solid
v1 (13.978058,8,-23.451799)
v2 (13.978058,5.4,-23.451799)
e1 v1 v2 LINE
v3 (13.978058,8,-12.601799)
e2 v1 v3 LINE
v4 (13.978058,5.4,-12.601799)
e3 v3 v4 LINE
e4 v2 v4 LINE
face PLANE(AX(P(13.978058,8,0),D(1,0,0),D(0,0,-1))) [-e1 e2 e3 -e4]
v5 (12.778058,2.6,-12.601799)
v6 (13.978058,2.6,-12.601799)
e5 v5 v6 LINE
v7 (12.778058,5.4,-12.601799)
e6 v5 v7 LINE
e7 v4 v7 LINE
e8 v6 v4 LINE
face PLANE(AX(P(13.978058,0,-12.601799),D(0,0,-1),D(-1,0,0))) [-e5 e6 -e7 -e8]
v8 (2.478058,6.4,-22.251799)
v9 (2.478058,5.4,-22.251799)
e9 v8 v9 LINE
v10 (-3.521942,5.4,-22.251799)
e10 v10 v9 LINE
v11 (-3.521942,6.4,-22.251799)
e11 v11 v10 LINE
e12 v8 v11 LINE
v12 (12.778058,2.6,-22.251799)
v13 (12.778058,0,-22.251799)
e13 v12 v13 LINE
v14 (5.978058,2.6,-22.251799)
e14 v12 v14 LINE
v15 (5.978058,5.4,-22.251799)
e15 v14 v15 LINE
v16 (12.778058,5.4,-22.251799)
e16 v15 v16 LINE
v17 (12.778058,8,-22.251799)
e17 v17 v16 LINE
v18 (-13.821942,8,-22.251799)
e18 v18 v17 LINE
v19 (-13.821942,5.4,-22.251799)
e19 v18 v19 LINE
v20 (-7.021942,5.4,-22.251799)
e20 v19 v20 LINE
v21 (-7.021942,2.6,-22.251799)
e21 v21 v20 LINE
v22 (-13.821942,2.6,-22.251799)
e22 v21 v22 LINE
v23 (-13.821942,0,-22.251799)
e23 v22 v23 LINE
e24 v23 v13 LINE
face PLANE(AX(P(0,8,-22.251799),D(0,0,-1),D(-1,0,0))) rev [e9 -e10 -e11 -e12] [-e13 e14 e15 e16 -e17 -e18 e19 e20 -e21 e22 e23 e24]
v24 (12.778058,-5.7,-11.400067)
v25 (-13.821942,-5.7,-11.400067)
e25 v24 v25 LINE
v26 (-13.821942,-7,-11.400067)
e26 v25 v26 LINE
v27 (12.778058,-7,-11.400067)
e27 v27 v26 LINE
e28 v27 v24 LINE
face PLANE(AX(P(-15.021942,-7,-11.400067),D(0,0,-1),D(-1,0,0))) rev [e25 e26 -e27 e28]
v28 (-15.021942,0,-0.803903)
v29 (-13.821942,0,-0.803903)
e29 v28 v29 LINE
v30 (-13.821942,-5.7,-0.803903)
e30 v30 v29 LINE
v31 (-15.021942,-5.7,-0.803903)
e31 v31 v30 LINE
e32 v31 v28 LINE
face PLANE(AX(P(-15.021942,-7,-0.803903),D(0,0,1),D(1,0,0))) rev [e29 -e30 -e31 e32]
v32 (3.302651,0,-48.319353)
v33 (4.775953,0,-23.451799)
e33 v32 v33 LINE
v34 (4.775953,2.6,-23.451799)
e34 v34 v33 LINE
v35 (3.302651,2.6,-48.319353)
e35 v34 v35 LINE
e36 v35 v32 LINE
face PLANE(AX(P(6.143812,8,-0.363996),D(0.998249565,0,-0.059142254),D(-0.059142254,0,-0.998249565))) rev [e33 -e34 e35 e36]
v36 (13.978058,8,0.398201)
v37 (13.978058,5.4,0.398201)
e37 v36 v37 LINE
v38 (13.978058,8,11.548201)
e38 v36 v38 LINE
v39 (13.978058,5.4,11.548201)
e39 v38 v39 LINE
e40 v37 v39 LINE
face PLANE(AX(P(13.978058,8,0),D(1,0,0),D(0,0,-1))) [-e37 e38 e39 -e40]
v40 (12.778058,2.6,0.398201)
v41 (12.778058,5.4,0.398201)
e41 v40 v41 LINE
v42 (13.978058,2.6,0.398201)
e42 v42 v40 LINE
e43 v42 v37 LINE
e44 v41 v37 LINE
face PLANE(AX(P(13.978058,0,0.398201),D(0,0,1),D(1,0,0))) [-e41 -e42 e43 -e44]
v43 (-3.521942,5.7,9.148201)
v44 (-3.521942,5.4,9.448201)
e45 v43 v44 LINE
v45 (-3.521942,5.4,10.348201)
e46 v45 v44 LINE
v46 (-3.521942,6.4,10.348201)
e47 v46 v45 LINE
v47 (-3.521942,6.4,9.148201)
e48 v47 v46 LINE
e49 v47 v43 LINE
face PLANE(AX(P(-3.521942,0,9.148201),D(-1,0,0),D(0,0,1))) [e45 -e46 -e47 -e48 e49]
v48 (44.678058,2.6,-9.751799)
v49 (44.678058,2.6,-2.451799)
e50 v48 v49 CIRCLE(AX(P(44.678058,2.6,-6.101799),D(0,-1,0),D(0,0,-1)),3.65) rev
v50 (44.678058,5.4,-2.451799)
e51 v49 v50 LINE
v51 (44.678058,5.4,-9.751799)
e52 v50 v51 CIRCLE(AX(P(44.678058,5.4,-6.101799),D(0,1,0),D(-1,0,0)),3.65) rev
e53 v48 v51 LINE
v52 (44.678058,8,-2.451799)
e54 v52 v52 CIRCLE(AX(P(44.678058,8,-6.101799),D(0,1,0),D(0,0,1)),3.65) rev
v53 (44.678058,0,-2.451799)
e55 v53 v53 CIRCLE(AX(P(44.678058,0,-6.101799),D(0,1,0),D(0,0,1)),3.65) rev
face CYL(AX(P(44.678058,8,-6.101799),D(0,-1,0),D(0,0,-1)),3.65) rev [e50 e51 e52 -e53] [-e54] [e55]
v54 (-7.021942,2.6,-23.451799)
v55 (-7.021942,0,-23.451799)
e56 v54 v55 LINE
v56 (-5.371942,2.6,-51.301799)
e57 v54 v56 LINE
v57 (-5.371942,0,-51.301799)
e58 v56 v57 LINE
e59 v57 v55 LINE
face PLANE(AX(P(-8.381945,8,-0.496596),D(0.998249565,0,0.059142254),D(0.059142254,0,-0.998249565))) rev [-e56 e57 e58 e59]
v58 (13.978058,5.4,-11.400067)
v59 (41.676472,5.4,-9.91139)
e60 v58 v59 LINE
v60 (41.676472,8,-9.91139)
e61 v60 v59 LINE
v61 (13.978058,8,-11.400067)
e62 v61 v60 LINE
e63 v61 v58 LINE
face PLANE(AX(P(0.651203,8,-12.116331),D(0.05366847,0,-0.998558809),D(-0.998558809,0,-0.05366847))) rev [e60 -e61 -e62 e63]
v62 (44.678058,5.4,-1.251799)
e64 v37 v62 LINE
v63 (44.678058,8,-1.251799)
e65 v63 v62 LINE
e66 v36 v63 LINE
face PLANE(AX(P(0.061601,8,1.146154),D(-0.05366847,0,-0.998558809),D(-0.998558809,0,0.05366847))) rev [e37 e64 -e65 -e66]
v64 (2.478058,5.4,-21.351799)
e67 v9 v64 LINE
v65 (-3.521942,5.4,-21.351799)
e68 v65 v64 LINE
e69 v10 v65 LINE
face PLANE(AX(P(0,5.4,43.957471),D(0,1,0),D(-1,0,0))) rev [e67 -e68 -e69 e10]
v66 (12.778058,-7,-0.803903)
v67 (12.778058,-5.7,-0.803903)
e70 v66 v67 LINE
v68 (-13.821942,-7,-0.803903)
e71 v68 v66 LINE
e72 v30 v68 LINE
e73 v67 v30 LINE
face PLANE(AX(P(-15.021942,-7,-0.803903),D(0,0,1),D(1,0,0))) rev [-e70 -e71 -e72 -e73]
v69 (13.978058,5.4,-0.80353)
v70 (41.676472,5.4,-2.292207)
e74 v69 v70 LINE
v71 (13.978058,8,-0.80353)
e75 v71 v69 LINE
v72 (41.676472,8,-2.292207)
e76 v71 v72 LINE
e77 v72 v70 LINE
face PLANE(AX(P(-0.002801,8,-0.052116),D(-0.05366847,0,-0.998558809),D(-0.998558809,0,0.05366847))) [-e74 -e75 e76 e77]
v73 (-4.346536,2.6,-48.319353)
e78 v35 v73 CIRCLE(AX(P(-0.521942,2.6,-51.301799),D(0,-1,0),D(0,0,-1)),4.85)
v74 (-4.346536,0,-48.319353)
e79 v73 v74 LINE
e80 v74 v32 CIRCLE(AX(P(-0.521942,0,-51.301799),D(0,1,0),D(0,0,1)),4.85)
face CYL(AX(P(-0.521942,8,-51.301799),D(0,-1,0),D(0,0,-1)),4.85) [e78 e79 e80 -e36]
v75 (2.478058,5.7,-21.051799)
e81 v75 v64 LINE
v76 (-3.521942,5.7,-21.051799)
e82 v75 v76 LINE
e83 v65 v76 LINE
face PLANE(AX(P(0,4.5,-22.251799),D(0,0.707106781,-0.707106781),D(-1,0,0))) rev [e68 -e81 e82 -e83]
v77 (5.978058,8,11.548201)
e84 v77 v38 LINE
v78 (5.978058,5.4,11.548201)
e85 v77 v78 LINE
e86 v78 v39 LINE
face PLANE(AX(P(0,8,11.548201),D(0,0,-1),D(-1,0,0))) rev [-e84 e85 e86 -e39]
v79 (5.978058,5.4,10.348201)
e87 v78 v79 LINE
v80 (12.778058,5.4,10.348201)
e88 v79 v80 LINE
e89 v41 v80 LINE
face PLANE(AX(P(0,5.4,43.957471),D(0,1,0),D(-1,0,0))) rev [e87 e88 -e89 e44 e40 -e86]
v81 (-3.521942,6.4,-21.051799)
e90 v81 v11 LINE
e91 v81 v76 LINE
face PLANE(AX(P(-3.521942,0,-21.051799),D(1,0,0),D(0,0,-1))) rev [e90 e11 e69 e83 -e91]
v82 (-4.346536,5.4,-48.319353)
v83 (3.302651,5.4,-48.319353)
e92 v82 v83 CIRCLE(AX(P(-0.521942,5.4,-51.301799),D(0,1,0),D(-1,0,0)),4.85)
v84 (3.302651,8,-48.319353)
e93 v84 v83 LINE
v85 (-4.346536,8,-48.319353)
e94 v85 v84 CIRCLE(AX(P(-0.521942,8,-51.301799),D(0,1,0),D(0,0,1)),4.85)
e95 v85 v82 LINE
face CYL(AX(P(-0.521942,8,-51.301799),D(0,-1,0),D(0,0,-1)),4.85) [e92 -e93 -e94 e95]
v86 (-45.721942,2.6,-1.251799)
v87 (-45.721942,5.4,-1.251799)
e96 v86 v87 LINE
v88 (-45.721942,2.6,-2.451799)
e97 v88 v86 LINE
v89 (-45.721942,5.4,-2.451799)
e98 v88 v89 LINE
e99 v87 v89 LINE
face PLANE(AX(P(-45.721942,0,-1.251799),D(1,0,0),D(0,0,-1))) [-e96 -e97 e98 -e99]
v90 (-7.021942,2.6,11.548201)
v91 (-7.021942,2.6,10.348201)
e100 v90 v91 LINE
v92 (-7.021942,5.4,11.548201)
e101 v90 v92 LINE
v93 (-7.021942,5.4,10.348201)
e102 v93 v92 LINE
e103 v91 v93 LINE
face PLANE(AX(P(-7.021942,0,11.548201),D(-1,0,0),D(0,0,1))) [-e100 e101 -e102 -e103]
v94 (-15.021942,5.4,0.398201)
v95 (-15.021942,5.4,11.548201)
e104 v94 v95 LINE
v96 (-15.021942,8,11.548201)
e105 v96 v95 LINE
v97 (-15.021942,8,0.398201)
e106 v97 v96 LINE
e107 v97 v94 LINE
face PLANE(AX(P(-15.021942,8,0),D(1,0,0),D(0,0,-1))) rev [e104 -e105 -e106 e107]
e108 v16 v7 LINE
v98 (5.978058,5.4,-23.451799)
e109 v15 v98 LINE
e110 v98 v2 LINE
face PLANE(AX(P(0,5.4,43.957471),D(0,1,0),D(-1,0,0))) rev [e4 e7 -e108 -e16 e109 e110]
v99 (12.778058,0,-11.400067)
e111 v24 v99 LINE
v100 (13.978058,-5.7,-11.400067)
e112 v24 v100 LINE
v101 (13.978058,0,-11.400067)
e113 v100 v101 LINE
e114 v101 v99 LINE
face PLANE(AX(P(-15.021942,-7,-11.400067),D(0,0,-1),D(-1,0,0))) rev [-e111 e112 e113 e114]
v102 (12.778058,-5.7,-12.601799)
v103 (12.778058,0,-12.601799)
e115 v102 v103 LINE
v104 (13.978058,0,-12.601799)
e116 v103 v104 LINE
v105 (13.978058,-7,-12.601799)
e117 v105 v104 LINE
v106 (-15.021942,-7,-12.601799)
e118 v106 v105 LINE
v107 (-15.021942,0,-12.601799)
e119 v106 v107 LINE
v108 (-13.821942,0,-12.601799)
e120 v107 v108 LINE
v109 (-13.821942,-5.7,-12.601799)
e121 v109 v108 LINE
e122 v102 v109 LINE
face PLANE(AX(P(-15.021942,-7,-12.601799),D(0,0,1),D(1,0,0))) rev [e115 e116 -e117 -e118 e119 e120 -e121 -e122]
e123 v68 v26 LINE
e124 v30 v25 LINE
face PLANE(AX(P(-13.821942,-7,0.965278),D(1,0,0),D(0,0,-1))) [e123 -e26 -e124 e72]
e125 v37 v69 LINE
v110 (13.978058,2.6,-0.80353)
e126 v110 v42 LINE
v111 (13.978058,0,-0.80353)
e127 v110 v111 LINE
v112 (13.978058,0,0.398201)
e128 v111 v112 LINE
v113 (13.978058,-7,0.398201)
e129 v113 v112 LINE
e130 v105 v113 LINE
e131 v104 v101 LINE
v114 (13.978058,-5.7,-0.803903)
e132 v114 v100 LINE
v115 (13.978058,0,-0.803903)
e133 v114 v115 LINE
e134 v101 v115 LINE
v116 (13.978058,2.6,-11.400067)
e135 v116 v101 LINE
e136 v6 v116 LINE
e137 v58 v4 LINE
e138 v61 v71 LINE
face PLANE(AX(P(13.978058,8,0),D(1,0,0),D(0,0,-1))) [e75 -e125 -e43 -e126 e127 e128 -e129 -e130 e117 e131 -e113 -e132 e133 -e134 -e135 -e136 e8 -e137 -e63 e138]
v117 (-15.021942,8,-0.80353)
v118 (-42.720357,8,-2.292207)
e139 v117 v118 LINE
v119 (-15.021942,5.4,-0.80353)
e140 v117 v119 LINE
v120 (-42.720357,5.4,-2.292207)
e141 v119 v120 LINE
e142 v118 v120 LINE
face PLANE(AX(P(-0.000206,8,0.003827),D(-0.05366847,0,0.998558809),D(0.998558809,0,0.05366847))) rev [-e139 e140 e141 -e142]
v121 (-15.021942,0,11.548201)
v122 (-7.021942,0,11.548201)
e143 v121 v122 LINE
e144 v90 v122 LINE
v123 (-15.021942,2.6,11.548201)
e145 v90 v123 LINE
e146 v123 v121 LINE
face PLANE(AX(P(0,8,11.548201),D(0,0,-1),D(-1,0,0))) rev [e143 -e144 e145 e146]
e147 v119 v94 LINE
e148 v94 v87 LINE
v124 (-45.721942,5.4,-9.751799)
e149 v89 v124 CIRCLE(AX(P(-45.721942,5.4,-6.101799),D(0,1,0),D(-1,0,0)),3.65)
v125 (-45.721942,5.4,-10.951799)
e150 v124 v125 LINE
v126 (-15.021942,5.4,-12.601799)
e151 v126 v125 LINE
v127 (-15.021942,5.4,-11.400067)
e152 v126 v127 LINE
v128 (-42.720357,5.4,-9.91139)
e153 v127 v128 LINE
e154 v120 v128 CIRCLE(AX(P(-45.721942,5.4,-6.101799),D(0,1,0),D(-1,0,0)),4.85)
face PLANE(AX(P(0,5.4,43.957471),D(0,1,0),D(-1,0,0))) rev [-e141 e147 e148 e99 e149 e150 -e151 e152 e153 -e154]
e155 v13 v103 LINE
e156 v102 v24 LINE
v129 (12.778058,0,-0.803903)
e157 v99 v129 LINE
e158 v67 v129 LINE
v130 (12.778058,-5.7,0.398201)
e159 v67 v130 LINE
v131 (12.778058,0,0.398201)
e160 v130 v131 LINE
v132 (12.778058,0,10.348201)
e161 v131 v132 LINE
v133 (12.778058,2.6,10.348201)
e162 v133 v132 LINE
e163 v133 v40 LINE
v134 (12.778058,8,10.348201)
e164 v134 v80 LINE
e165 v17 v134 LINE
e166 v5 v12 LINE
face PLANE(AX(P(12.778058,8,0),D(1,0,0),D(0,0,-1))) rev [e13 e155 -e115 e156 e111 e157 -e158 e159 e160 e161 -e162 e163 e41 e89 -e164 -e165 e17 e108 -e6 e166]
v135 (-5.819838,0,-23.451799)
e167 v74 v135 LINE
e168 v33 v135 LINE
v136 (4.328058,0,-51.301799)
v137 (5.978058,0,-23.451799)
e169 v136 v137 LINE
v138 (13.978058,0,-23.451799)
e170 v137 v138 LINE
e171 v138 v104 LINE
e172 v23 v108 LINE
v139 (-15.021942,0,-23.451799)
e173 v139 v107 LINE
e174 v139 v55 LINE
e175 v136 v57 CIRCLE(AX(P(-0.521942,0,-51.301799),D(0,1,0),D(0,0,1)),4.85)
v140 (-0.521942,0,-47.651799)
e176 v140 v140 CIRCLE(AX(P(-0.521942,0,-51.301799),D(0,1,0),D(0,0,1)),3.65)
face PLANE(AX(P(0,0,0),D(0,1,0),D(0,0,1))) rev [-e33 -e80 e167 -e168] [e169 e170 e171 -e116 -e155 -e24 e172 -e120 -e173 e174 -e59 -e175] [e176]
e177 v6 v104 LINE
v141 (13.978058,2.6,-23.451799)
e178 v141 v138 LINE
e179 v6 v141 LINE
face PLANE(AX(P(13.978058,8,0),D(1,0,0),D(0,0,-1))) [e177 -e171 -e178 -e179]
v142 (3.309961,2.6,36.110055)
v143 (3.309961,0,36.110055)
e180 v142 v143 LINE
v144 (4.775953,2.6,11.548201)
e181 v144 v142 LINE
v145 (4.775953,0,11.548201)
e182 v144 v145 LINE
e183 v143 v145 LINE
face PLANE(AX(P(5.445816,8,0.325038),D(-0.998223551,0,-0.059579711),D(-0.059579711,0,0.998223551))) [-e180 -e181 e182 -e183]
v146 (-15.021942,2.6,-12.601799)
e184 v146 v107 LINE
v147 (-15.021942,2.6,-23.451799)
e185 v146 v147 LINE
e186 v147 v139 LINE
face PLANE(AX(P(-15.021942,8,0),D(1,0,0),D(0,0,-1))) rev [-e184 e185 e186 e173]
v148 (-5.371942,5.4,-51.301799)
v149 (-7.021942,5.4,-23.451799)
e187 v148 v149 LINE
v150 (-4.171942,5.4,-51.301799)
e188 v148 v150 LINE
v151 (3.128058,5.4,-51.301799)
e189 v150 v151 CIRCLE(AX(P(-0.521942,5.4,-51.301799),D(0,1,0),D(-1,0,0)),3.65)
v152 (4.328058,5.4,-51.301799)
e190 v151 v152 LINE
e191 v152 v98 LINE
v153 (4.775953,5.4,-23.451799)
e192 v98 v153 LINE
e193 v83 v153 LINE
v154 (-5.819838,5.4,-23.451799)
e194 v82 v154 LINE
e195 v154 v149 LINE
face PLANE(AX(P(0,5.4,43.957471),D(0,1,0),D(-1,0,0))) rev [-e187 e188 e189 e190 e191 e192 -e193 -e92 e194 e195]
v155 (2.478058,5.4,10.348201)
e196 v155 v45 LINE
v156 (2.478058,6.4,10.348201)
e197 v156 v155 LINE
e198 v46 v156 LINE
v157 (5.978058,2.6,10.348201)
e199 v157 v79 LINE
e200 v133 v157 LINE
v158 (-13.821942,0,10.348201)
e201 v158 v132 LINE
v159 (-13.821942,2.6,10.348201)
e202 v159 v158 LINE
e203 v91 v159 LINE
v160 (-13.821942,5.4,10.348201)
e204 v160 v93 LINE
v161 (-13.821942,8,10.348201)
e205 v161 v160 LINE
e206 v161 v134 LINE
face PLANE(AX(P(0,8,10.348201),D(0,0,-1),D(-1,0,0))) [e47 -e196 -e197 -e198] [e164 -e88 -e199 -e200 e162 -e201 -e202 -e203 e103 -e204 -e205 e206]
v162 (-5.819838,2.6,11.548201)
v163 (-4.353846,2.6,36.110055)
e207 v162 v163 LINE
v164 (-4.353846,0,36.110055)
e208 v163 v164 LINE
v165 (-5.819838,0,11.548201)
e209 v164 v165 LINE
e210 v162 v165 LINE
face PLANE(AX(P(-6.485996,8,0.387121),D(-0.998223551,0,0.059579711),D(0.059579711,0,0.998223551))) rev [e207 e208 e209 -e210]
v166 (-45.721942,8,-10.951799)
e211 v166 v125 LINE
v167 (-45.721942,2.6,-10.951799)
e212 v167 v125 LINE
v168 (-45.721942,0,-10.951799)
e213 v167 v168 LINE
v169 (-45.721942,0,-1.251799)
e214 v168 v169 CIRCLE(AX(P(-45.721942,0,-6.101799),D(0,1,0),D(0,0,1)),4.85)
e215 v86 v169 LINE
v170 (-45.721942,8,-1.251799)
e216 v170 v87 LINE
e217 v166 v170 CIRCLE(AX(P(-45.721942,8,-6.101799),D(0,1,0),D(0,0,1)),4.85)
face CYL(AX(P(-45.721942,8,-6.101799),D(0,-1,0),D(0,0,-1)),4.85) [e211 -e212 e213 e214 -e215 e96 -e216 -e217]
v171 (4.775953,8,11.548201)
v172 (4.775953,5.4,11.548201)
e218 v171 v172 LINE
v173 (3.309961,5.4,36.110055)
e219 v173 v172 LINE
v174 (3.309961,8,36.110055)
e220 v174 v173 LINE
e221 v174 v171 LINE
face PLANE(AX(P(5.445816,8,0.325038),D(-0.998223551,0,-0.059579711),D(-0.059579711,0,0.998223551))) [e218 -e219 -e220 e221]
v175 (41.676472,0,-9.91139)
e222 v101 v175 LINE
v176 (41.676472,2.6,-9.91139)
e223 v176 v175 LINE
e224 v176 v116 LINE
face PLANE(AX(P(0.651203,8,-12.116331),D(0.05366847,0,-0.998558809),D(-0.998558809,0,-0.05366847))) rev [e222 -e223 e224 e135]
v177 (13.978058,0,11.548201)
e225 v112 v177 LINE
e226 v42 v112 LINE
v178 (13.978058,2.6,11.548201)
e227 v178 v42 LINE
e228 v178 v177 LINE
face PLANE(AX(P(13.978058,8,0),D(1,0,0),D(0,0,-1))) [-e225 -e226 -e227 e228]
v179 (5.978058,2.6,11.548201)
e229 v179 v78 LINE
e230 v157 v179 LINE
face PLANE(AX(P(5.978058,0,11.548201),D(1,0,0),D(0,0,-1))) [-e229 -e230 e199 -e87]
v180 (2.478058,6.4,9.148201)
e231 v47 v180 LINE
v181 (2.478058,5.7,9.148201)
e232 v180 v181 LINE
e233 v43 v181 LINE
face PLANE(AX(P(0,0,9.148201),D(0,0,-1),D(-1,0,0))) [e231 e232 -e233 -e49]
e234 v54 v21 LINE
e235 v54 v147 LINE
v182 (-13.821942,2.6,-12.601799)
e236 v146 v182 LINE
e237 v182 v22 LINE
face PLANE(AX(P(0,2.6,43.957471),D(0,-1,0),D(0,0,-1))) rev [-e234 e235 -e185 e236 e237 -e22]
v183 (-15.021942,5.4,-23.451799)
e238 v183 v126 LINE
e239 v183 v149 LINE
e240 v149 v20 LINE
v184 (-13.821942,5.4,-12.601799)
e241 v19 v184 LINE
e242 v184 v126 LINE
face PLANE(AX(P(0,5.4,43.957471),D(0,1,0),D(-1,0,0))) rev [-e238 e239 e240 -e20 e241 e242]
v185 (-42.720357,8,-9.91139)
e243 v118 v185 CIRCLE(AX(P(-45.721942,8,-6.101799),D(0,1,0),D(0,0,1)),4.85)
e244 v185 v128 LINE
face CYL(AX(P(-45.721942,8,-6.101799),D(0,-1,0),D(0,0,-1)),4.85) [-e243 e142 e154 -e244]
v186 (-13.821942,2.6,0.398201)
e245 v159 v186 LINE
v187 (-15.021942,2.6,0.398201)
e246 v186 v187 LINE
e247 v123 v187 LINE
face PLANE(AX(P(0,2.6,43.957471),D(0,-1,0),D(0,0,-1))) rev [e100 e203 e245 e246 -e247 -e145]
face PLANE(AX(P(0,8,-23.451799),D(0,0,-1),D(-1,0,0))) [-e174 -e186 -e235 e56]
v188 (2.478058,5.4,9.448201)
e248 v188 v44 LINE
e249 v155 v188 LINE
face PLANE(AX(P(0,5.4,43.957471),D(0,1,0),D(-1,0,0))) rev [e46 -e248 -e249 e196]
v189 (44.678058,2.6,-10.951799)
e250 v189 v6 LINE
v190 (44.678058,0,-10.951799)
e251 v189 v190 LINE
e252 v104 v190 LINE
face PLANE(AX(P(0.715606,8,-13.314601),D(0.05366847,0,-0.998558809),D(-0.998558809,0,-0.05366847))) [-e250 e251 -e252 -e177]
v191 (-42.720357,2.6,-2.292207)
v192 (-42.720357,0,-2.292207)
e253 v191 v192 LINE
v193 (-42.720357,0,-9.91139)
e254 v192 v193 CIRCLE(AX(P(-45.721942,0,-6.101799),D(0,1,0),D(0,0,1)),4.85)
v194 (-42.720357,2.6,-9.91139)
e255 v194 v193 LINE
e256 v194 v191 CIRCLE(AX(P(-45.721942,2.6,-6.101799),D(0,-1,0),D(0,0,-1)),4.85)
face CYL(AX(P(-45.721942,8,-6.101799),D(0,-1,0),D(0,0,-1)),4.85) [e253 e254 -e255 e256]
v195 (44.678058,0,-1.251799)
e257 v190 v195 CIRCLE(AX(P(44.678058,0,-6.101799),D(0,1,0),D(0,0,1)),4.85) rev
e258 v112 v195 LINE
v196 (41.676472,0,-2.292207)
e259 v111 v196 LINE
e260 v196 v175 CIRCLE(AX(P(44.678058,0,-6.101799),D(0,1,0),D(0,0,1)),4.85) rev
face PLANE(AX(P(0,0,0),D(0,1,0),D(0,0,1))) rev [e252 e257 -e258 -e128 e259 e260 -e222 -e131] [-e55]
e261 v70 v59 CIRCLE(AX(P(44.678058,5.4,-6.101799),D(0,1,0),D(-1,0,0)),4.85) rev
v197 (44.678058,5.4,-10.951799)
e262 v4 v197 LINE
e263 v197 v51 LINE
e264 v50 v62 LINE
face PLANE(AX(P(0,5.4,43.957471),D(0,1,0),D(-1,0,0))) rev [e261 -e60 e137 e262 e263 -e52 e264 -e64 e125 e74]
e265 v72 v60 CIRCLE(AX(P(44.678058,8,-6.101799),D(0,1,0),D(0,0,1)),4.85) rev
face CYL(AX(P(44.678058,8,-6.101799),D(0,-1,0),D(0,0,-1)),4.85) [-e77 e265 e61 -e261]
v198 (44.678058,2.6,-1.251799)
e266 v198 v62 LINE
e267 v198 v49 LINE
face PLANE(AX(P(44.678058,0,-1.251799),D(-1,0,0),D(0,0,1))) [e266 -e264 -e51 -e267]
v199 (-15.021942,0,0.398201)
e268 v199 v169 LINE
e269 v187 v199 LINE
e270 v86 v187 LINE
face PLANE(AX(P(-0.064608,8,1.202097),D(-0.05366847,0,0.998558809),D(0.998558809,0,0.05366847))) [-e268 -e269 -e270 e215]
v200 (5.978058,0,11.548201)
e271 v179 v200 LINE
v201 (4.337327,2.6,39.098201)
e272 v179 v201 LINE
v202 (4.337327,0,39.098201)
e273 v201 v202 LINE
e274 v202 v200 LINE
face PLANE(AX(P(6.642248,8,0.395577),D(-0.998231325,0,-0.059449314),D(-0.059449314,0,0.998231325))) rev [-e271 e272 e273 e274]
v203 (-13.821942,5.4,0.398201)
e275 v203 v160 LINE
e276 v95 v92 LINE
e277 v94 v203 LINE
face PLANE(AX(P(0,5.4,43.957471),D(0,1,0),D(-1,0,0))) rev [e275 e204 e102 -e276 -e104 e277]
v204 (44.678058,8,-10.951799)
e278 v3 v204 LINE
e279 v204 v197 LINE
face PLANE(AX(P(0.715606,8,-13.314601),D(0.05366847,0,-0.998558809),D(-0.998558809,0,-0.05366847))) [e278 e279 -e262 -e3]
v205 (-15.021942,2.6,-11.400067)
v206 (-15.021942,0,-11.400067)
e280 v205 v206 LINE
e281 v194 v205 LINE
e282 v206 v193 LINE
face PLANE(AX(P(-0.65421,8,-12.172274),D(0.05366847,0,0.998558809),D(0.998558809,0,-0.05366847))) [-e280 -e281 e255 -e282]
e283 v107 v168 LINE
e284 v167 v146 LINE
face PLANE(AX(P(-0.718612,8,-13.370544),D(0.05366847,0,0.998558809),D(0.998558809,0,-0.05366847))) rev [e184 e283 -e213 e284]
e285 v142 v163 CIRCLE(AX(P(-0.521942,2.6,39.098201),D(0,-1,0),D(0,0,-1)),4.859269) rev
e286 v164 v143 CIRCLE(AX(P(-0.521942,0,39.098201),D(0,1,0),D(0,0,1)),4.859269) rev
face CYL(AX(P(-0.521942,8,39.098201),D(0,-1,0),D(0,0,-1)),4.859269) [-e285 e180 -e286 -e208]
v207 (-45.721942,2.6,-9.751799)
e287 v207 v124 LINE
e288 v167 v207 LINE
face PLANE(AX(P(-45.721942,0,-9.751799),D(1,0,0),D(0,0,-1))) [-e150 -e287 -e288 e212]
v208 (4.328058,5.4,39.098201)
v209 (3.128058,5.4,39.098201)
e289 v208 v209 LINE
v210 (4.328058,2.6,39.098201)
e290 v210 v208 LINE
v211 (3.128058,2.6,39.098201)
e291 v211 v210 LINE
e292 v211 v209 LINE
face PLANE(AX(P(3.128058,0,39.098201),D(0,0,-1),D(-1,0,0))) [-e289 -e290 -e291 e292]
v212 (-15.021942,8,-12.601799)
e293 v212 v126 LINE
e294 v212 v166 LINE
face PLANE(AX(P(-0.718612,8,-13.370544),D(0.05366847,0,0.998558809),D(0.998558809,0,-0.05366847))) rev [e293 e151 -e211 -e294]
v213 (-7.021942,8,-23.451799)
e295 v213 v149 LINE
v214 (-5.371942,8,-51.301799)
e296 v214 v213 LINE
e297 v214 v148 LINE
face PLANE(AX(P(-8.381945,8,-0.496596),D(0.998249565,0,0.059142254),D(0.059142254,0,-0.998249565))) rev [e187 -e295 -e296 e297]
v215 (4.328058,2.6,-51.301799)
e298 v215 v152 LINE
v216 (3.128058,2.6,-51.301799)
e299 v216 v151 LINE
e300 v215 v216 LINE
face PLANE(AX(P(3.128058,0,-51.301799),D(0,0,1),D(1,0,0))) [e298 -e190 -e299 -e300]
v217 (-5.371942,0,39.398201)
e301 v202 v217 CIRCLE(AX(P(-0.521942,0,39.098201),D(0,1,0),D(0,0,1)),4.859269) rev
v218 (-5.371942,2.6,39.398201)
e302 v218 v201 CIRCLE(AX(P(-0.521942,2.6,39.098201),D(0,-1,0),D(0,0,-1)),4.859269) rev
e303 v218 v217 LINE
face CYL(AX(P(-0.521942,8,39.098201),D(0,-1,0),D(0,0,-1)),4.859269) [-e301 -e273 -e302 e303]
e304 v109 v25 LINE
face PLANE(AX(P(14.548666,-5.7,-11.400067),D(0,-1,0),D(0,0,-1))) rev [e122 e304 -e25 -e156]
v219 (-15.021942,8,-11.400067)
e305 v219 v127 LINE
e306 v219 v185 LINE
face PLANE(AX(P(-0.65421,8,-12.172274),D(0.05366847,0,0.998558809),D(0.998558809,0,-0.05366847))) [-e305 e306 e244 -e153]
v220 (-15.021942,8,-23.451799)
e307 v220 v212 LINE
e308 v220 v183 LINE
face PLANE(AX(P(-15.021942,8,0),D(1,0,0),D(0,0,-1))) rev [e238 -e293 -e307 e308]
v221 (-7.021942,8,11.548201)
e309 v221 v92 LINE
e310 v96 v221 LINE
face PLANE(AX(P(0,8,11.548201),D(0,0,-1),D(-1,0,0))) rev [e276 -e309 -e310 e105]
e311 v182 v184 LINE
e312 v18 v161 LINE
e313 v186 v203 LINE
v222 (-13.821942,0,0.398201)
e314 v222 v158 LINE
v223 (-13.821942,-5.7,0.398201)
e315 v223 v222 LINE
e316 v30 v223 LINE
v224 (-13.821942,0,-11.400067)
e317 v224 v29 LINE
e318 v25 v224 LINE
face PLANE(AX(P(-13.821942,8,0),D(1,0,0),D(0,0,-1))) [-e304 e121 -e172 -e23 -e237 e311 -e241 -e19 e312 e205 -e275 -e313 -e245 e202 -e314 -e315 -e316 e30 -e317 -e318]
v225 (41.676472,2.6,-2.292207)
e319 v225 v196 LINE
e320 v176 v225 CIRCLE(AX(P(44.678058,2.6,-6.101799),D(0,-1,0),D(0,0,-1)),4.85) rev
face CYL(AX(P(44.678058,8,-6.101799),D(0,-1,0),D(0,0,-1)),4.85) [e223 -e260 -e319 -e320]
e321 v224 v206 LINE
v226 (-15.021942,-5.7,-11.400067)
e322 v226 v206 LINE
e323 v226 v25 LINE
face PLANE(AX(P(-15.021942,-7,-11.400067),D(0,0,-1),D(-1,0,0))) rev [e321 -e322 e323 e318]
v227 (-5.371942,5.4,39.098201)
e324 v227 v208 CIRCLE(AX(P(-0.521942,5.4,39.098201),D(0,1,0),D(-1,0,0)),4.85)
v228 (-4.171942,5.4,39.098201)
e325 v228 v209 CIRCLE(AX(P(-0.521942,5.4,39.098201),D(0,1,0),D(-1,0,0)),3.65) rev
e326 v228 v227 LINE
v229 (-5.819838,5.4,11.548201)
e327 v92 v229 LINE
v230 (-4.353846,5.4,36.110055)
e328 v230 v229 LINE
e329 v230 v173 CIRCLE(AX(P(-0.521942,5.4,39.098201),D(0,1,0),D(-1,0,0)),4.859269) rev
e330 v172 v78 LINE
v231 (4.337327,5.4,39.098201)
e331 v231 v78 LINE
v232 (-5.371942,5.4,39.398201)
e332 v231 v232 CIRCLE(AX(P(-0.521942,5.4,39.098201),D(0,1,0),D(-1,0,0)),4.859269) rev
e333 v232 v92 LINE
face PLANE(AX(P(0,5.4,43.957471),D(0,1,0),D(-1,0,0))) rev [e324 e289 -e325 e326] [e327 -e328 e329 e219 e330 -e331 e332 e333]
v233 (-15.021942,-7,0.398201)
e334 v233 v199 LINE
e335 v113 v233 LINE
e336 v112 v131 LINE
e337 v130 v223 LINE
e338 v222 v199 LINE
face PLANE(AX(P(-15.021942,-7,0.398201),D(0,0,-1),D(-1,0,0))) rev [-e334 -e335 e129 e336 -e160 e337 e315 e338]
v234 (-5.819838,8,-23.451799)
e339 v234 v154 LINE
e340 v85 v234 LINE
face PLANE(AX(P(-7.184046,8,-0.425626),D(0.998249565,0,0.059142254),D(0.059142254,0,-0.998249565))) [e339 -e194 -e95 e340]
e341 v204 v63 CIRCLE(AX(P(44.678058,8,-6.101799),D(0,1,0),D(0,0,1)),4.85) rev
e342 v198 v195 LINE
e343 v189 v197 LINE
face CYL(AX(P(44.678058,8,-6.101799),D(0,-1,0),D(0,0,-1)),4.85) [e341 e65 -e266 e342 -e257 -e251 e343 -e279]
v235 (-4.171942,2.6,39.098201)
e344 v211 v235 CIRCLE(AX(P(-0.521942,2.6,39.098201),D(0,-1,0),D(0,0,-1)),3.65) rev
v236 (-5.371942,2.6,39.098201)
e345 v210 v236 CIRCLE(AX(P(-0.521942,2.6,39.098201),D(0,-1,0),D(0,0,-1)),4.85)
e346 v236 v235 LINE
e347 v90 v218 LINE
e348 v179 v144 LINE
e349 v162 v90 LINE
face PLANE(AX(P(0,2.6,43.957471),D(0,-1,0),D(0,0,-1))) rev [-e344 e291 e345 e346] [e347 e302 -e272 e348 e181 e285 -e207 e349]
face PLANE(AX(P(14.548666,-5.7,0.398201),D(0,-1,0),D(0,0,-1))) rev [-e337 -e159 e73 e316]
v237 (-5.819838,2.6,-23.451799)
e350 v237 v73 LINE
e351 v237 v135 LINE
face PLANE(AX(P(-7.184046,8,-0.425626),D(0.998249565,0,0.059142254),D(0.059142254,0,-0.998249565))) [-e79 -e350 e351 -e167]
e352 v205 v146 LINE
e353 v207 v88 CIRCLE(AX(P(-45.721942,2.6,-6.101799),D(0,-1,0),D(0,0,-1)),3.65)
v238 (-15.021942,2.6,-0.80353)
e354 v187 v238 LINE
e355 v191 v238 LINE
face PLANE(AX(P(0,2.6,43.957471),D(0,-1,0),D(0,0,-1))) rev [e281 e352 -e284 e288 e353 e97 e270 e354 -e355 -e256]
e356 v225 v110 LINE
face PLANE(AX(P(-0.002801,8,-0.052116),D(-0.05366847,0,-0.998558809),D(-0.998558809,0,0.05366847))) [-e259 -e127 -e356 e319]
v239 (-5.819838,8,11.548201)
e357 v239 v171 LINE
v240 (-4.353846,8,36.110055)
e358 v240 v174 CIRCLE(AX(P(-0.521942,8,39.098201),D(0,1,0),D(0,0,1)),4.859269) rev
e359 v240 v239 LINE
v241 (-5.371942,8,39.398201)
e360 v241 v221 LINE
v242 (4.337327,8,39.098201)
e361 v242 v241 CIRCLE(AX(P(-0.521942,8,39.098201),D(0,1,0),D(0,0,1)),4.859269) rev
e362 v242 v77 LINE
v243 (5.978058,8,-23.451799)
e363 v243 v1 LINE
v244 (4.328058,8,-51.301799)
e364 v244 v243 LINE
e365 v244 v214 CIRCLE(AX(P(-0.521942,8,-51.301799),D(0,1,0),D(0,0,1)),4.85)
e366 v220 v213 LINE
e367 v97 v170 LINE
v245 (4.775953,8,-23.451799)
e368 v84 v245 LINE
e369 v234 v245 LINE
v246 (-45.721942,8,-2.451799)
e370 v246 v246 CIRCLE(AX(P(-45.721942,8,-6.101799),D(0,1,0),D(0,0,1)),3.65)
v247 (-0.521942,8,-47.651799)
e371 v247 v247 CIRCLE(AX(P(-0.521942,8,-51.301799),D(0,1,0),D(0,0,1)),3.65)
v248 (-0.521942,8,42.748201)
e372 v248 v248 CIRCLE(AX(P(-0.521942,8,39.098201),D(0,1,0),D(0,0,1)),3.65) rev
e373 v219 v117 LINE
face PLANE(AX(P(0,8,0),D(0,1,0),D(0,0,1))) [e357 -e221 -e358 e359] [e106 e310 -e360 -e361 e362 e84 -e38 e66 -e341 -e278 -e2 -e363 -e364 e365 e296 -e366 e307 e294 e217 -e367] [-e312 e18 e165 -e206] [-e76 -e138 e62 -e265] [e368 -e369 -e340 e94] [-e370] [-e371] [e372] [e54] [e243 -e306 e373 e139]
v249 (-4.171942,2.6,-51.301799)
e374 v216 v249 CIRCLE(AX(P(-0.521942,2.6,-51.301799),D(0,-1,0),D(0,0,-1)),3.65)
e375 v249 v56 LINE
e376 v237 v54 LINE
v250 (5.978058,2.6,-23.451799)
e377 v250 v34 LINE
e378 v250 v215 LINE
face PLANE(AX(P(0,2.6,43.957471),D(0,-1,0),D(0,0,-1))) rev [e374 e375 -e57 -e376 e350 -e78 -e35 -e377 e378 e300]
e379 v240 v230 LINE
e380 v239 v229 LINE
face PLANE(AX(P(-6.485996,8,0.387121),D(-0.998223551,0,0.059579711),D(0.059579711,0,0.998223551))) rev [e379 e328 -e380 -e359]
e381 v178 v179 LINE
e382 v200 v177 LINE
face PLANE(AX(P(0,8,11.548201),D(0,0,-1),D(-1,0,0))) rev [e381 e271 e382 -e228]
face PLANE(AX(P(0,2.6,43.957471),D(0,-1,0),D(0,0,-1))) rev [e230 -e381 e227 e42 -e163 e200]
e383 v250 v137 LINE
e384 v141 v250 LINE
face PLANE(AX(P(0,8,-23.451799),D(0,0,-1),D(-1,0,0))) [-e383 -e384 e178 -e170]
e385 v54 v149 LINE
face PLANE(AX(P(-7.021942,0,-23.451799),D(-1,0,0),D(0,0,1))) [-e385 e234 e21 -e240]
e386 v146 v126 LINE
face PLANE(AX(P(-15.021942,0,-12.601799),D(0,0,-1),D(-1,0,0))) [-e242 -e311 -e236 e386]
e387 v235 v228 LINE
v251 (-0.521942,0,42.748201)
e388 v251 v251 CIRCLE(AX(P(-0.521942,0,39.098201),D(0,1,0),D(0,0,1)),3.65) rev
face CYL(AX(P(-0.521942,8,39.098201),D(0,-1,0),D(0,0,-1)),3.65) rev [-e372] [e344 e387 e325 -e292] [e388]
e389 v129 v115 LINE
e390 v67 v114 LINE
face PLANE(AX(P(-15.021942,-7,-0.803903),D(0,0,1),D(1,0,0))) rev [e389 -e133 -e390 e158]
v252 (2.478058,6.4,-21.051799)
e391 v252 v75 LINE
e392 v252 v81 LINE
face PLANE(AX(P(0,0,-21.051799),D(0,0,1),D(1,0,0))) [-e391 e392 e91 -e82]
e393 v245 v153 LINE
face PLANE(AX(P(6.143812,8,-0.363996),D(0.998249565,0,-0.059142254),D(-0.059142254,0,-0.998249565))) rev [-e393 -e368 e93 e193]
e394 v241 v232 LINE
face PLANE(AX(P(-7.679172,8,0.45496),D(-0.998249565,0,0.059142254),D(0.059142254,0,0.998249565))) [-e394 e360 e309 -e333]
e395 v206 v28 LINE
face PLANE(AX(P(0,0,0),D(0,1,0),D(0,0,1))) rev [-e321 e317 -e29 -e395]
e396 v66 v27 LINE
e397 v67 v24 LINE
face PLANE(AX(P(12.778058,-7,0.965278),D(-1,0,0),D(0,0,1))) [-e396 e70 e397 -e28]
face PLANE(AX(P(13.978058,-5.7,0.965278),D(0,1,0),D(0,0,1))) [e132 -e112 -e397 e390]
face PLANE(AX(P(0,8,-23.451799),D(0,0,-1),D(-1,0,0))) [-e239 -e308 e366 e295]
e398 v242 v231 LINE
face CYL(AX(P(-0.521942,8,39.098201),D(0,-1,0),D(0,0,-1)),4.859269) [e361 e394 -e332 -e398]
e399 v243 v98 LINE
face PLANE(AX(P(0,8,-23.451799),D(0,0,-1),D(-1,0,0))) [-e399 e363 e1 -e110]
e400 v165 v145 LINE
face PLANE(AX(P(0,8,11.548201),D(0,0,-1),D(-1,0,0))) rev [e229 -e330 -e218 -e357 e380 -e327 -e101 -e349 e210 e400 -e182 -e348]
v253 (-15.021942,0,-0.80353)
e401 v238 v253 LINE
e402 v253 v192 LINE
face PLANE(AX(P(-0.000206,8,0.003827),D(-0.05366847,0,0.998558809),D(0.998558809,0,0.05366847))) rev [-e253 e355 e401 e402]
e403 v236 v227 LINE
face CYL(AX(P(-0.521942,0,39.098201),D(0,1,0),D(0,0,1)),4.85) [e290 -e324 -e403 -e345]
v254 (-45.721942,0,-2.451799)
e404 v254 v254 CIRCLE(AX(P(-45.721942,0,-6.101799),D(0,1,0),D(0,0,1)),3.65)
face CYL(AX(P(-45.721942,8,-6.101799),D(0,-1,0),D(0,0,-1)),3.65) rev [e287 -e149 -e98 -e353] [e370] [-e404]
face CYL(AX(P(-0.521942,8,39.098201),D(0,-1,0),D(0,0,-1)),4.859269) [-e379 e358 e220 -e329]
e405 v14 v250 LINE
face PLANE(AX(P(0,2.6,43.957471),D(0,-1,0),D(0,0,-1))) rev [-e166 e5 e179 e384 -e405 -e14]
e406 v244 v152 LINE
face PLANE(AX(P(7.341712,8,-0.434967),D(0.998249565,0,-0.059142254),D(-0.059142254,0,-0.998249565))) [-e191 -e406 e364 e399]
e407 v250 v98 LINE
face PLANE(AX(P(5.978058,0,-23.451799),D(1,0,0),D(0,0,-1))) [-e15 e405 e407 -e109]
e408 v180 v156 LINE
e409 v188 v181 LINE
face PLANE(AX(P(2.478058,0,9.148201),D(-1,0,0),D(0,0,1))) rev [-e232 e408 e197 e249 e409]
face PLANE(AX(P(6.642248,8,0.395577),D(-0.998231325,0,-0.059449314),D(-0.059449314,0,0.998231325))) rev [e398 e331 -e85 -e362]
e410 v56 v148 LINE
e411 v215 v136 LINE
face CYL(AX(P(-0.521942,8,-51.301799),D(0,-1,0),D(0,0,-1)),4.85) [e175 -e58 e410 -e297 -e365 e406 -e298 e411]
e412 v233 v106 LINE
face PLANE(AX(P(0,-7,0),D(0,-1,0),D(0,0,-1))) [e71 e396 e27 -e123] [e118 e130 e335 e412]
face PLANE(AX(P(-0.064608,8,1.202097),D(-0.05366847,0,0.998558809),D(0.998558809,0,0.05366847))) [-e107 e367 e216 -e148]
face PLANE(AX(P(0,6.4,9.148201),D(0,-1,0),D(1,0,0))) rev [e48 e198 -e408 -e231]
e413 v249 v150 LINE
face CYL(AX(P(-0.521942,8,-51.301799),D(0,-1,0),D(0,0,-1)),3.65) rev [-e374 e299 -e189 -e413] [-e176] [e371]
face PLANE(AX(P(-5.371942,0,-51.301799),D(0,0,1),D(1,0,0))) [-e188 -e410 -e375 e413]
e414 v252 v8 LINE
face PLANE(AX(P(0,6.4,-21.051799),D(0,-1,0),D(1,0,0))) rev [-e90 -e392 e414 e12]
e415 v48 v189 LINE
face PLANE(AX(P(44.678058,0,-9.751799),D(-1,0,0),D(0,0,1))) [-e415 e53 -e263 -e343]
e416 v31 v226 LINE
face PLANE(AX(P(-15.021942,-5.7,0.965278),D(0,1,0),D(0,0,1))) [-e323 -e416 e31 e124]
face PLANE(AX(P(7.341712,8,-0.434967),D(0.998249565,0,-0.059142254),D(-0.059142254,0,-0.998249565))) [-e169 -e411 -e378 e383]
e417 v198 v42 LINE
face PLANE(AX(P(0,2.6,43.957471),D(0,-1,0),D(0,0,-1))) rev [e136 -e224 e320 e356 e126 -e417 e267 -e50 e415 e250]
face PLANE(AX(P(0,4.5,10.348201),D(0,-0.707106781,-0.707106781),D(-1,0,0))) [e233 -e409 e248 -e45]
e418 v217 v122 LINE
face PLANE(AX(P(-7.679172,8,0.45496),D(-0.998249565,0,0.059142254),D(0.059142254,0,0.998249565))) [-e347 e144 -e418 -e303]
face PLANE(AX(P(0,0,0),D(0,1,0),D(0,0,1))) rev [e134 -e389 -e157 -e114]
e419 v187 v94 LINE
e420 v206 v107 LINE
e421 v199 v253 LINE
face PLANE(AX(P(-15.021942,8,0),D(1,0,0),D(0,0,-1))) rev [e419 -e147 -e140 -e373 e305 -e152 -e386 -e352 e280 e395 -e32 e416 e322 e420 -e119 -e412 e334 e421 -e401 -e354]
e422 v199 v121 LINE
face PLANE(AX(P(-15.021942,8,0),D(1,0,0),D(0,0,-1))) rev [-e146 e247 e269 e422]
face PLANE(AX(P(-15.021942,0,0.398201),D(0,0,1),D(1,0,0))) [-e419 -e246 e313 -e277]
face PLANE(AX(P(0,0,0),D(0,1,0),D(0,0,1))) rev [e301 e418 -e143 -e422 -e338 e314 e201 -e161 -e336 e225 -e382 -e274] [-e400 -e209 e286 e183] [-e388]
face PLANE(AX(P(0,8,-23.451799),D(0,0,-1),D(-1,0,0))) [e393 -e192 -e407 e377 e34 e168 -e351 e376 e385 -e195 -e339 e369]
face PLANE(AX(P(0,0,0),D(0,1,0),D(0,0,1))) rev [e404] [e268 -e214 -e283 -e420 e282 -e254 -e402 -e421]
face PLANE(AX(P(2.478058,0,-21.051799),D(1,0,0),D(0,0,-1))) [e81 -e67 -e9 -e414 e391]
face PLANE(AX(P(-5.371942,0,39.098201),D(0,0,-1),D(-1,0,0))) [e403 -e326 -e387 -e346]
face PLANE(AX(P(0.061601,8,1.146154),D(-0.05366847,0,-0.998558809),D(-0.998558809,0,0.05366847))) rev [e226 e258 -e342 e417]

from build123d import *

# Parameters (mm, degrees)
SKETCH1_R               = 3.65
SKETCH1_W               = 26.6
SKETCH1_H               = 32.6
BOSS_EXTRUDE1_DEPTH     = 8
SKETCH2_W               = 3
SKETCH2_H               = 0.7
BOSS_EXTRUDE2_DEPTH     = 1.2
SKETCH3_W               = 3
SKETCH3_H               = 0.7
BOSS_EXTRUDE3_DEPTH     = 1.2
CHAMFER1_SIZE           = 1.2
CUT_EXTRUDE1_DEPTH      = 85.649459397
CUT_EXTRUDE1_DEPTH_BACK = 85.649459397
SKETCH4_W               = 48.801078557
SKETCH4_H               = 1.4
SKETCH4_W_2             = 10.59579159
SKETCH4_W_3             = 46.838011079
BOSS_EXTRUDE4_START     = -5.4
SKETCH5_W               = 13
SKETCH5_H               = 1.2
SKETCH5_W_2             = 1.2
SKETCH5_H_2             = 13
BOSS_EXTRUDE4_DEPTH     = 2.8
BOSS_EXTRUDE5_REACH     = 77.99
SKETCH7_W               = 1.2
SKETCH7_H               = 1.202104206
SKETCH7_H_2             = 1.201731925
BOSS_EXTRUDE6_DEPTH     = 7
SKETCH8_W               = 1.202104206
SKETCH8_H               = 1.3
SKETCH8_W_2             = 1.201731925
BOSS_EXTRUDE7_DEPTH     = 26.6
SKETCH9_W               = 1.2
SKETCH9_H               = 1.3
BOSS_EXTRUDE8_DEPTH     = 11.797895795


with BuildPart() as part:
    # Sketch1 → Boss-Extrude1 (new body)
    with BuildSketch(Plane(origin=(0, 0, 0), x_dir=(1, 0, 0), z_dir=(0, 1, 0))):
        with BuildLine():
            Line((-7.021942446, 23.451798561), (-15.021942446, 23.451798561))
            Line((-15.021942446, 23.451798561), (-15.021942446, 12.601798561))
            Line((-15.021942446, 12.601798561), (-45.721942446, 10.951798561))
            ThreePointArc((-45.721942446, 10.951798561), (-50.571942446, 6.101798561), (-45.721942446, 1.251798561))
            Line((-45.721942446, 1.251798561), (-15.021942446, -0.398201439))
            Line((-15.021942446, -0.398201439), (-15.021942446, -11.548201439))
            Line((-15.021942446, -11.548201439), (-7.021942446, -11.548201439))
            Line((-7.021942446, -11.548201439), (-5.371942446, -39.398201439))
            ThreePointArc((-5.371942446, -39.398201439), (-0.37187086, -43.955153005), (4.337327046, -39.098201439))
            Line((4.337327046, -39.098201439), (5.978057554, -11.548201439))
            Line((5.978057554, -11.548201439), (13.978057554, -11.548201439))
            Line((13.978057554, -11.548201439), (13.978057554, -0.398201439))
            Line((13.978057554, -0.398201439), (44.678057554, 1.251798561))
            ThreePointArc((44.678057554, 1.251798561), (49.528057554, 6.101798561), (44.678057554, 10.951798561))
            Line((44.678057554, 10.951798561), (13.978057554, 12.601798561))
            Line((13.978057554, 12.601798561), (13.978057554, 23.451798561))
            Line((13.978057554, 23.451798561), (5.978057554, 23.451798561))
            Line((5.978057554, 23.451798561), (4.328057554, 51.301798561))
            ThreePointArc((4.328057554, 51.301798561), (-0.521942446, 56.151798561), (-5.371942446, 51.301798561))
            Line((-5.371942446, 51.301798561), (-7.021942446, 23.451798561))
        make_face()
        with Locations(Location((-0.521942446, -39.098201439, 0), (0, 0, 270))):
            Circle(SKETCH1_R, mode=Mode.SUBTRACT)
        with BuildLine():
            Line((4.775953349, -11.548201439), (3.309960917, -36.110055423))
            ThreePointArc((3.309960917, -36.110055423), (-0.521942446, -34.238931946), (-4.35384581, -36.110055423))
            Line((-4.35384581, -36.110055423), (-5.819838241, -11.548201439))
            Line((-5.819838241, -11.548201439), (4.775953349, -11.548201439))
        make_face(mode=Mode.SUBTRACT)
        with Locations((-0.521942446, 5.951798561)):
            Rectangle(SKETCH1_W, SKETCH1_H, mode=Mode.SUBTRACT)
        with Locations(Location((-45.721942446, 6.101798561, 0), (0, 0, 270))):
            Circle(SKETCH1_R, mode=Mode.SUBTRACT)
        with BuildLine():
            Line((-42.720356894, 9.911389638), (-15.021942446, 11.400066636))
            Line((-15.021942446, 11.400066636), (-15.021942446, 0.803530486))
            Line((-15.021942446, 0.803530486), (-42.720356894, 2.292207484))
            ThreePointArc((-42.720356894, 2.292207484), (-40.871942446, 6.101798561), (-42.720356894, 9.911389638))
        make_face(mode=Mode.SUBTRACT)
        with BuildLine():
            Line((-5.819838241, 23.451798561), (-4.34653611, 48.319352702))
            ThreePointArc((-4.34653611, 48.319352702), (-0.521942446, 46.451798561), (3.302651218, 48.319352702))
            Line((3.302651218, 48.319352702), (4.775953349, 23.451798561))
            Line((4.775953349, 23.451798561), (-5.819838241, 23.451798561))
        make_face(mode=Mode.SUBTRACT)
        with Locations(Location((-0.521942446, 51.301798561, 0), (0, 0, 270))):
            Circle(SKETCH1_R, mode=Mode.SUBTRACT)
        with BuildLine():
            Line((41.676472002, 2.292207484), (13.978057554, 0.803530486))
            Line((13.978057554, 0.803530486), (13.978057554, 11.400066636))
            Line((13.978057554, 11.400066636), (41.676472002, 9.911389638))
            ThreePointArc((41.676472002, 9.911389638), (39.828057554, 6.101798561), (41.676472002, 2.292207484))
        make_face(mode=Mode.SUBTRACT)
        with Locations(Location((44.678057554, 6.101798561, 0), (0, 0, 270))):
            Circle(SKETCH1_R, mode=Mode.SUBTRACT)
    extrude(amount=BOSS_EXTRUDE1_DEPTH)

    # Sketch2 → Boss-Extrude2 (add)
    with BuildSketch(Plane.XY.offset(-22.251798561)):
        with Locations((-2.021942446, 6.05)):
            Rectangle(SKETCH2_W, SKETCH2_H)
        with Locations((0.978057554, 6.05)):
            Rectangle(SKETCH2_W, SKETCH2_H)
    extrude(amount=BOSS_EXTRUDE2_DEPTH)

    # Sketch3 → Boss-Extrude3 (add)
    with BuildSketch(Plane(origin=(0, 0, 10.348201439), x_dir=(-1, 0, 0), z_dir=(0, 0, -1))):
        with Locations((-0.978057554, 6.05)):
            Rectangle(SKETCH3_W, SKETCH3_H)
        with Locations((2.021942446, 6.05)):
            Rectangle(SKETCH3_W, SKETCH3_H)
    extrude(amount=BOSS_EXTRUDE3_DEPTH)

    # Chamfer1
    chamfer1_edges = [part.edges().sort_by_distance(p)[0] for p in [
        (-0.521942446, 5.7, -22.251798561),
        (-0.521942446, 5.7, 10.348201439),
    ]]
    chamfer(chamfer1_edges, length=CHAMFER1_SIZE - 0.0001)  # a hair under: the kernel refuses the full size

    # Sketch4 → Cut-Extrude1 (cut, two sides: drawn at the far end of the back side and taken through both)
    with BuildSketch(Plane(origin=(0, 0, -23.451798561), x_dir=(-1, 0, 0), z_dir=(0, 0, -1)).offset(-CUT_EXTRUDE1_DEPTH_BACK)):
        with Locations((-29.176492628, 3.3)):
            Rectangle(SKETCH4_W, SKETCH4_H)
        with Locations((-29.176492628, 4.7)):
            Rectangle(SKETCH4_W, SKETCH4_H)
        with Locations((0.521942446, 4.7)):
            Rectangle(SKETCH4_W_2, SKETCH4_H)
        with Locations((0.521942446, 3.3)):
            Rectangle(SKETCH4_W_2, SKETCH4_H)
        with Locations((29.238843781, 3.3)):
            Rectangle(SKETCH4_W_3, SKETCH4_H)
        with Locations((29.238843781, 4.7)):
            Rectangle(SKETCH4_W_3, SKETCH4_H)
    extrude(amount=CUT_EXTRUDE1_DEPTH + CUT_EXTRUDE1_DEPTH_BACK, mode=Mode.SUBTRACT)


with BuildPart() as cut_extrude1_piece_1:
    # of the separate pieces the step leaves, piece 1, a body of its own (cut_extrude1_pieces)
    add(part.part.solids().sort_by_distance((-3.521942446, 6.4, 10.348201439))[0])



with BuildPart() as cut_extrude1_piece_2:
    # of the separate pieces the step leaves, piece 2, a body of its own (cut_extrude1_pieces)
    add(part.part.solids().sort_by_distance((12.778057554, 2.6, 10.348201439))[0])


with BuildPart() as cut_extrude1_piece_1_1:
    add(cut_extrude1_piece_1.part)

    add(cut_extrude1_piece_2.part)  # Boss-Extrude4 merges Cut-Extrude1 piece 2
    # Sketch5 → Boss-Extrude4 (add)
    with BuildSketch(Plane(origin=(0, 8, 0), x_dir=(1, 0, 0), z_dir=(0, 1, 0)).offset(BOSS_EXTRUDE4_START)):
        with Locations((-0.521942446, 22.851798561)):
            Rectangle(SKETCH5_W, SKETCH5_H)
        with Locations((-0.521942446, -10.948201439)):
            Rectangle(SKETCH5_W, SKETCH5_H)
        with Locations((-14.421942446, 6.101798561)):
            Rectangle(SKETCH5_W_2, SKETCH5_H_2)
        with Locations((13.378057554, 6.101798561)):
            Rectangle(SKETCH5_W_2, SKETCH5_H_2)
    extrude(amount=BOSS_EXTRUDE4_DEPTH)

    # Sketch6 → Boss-Extrude5 (add, up to next)
    with BuildSketch(Plane(origin=(0, 8, 0), x_dir=(1, 0, 0), z_dir=(0, 1, 0)), mode=Mode.PRIVATE) as boss_extrude5_sk1:
        with BuildLine():
            Line((-5.371942446, 51.301798561), (-4.171942446, 51.301798561))
            ThreePointArc((-4.171942446, 51.301798561), (-0.521942446, 54.951798561), (3.128057554, 51.301798561))
            Line((3.128057554, 51.301798561), (4.328057554, 51.301798561))
            ThreePointArc((4.328057554, 51.301798561), (-0.521942446, 56.151798561), (-5.371942446, 51.301798561))
        make_face()
    boss_extrude5_tool1 = extrude(boss_extrude5_sk1.sketch, amount=-BOSS_EXTRUDE5_REACH, mode=Mode.PRIVATE) - cut_extrude1_piece_1_1.part
    # Sketch6 → Boss-Extrude5 (add, up to next)
    with BuildSketch(Plane(origin=(0, 8, 0), x_dir=(1, 0, 0), z_dir=(0, 1, 0)), mode=Mode.PRIVATE) as boss_extrude5_sk2:
        with BuildLine():
            Line((3.128057554, -39.098201439), (4.328057554, -39.098201439))
            ThreePointArc((4.328057554, -39.098201439), (-0.521942446, -43.948201439), (-5.371942446, -39.098201439))
            Line((-5.371942446, -39.098201439), (-4.171942446, -39.098201439))
            ThreePointArc((-4.171942446, -39.098201439), (-0.521942446, -42.748201439), (3.128057554, -39.098201439))
        make_face()
    boss_extrude5_tool2 = extrude(boss_extrude5_sk2.sketch, amount=-BOSS_EXTRUDE5_REACH, mode=Mode.PRIVATE) - cut_extrude1_piece_1_1.part
    # Sketch6 → Boss-Extrude5 (add, up to next)
    with BuildSketch(Plane(origin=(0, 8, 0), x_dir=(1, 0, 0), z_dir=(0, 1, 0)), mode=Mode.PRIVATE) as boss_extrude5_sk3:
        with BuildLine():
            Line((44.678057554, 9.751798561), (44.678057554, 10.951798561))
            ThreePointArc((44.678057554, 10.951798561), (49.528057554, 6.101798561), (44.678057554, 1.251798561))
            Line((44.678057554, 1.251798561), (44.678057554, 2.451798561))
            ThreePointArc((44.678057554, 2.451798561), (48.328057554, 6.101798561), (44.678057554, 9.751798561))
        make_face()
    boss_extrude5_tool3 = extrude(boss_extrude5_sk3.sketch, amount=-BOSS_EXTRUDE5_REACH, mode=Mode.PRIVATE) - cut_extrude1_piece_1_1.part
    # Sketch6 → Boss-Extrude5 (add, up to next)
    with BuildSketch(Plane(origin=(0, 8, 0), x_dir=(1, 0, 0), z_dir=(0, 1, 0)), mode=Mode.PRIVATE) as boss_extrude5_sk4:
        with BuildLine():
            Line((-45.721942446, 1.251798561), (-45.721942446, 2.451798561))
            ThreePointArc((-45.721942446, 2.451798561), (-49.371942446, 6.101798561), (-45.721942446, 9.751798561))
            Line((-45.721942446, 9.751798561), (-45.721942446, 10.951798561))
            ThreePointArc((-45.721942446, 10.951798561), (-50.571942446, 6.101798561), (-45.721942446, 1.251798561))
        make_face()
    boss_extrude5_tool4 = extrude(boss_extrude5_sk4.sketch, amount=-BOSS_EXTRUDE5_REACH, mode=Mode.PRIVATE) - cut_extrude1_piece_1_1.part
    add(boss_extrude5_tool1.solids().sort_by_distance((-4.771942, 8, -51.410248))[0])
    add(boss_extrude5_tool2.solids().sort_by_distance((-0.521942, 8, 43.839752))[0])
    add(boss_extrude5_tool3.solids().sort_by_distance((44.786507, 8, -10.351799))[0])
    add(boss_extrude5_tool4.solids().sort_by_distance((-45.830392, 8, -10.351799))[0])

    # Sketch7 → Boss-Extrude6 (add)
    with BuildSketch(Plane.XZ):
        with Locations((-14.421942446, -0.202850664)):
            Rectangle(SKETCH7_W, SKETCH7_H)
        with Locations((-14.421942446, -12.000932599)):
            Rectangle(SKETCH7_W, SKETCH7_H_2)
        with Locations((13.378057554, -0.202850664)):
            Rectangle(SKETCH7_W, SKETCH7_H)
        with Locations((13.378057554, -12.000932599)):
            Rectangle(SKETCH7_W, SKETCH7_H_2)
    extrude(amount=BOSS_EXTRUDE6_DEPTH)

    # Sketch8 → Boss-Extrude7 (add)
    with BuildSketch(Plane(origin=(-13.821942446, 0, 0), x_dir=(0, 0, -1), z_dir=(1, 0, 0))):
        with Locations((0.202850664, -6.35)):
            Rectangle(SKETCH8_W, SKETCH8_H)
        with Locations((12.000932599, -6.35)):
            Rectangle(SKETCH8_W_2, SKETCH8_H)
    extrude(amount=BOSS_EXTRUDE7_DEPTH)

    # Sketch9 → Boss-Extrude8 (add)
    with BuildSketch(Plane(origin=(0, 0, -12.601798561), x_dir=(-1, 0, 0), z_dir=(0, 0, -1))):
        with Locations((-13.378057554, -6.35)):
            Rectangle(SKETCH9_W, SKETCH9_H)
        with Locations((14.421942446, -6.35)):
            Rectangle(SKETCH9_W, SKETCH9_H)
    extrude(amount=-BOSS_EXTRUDE8_DEPTH)


solid = cut_extrude1_piece_1_1.part
